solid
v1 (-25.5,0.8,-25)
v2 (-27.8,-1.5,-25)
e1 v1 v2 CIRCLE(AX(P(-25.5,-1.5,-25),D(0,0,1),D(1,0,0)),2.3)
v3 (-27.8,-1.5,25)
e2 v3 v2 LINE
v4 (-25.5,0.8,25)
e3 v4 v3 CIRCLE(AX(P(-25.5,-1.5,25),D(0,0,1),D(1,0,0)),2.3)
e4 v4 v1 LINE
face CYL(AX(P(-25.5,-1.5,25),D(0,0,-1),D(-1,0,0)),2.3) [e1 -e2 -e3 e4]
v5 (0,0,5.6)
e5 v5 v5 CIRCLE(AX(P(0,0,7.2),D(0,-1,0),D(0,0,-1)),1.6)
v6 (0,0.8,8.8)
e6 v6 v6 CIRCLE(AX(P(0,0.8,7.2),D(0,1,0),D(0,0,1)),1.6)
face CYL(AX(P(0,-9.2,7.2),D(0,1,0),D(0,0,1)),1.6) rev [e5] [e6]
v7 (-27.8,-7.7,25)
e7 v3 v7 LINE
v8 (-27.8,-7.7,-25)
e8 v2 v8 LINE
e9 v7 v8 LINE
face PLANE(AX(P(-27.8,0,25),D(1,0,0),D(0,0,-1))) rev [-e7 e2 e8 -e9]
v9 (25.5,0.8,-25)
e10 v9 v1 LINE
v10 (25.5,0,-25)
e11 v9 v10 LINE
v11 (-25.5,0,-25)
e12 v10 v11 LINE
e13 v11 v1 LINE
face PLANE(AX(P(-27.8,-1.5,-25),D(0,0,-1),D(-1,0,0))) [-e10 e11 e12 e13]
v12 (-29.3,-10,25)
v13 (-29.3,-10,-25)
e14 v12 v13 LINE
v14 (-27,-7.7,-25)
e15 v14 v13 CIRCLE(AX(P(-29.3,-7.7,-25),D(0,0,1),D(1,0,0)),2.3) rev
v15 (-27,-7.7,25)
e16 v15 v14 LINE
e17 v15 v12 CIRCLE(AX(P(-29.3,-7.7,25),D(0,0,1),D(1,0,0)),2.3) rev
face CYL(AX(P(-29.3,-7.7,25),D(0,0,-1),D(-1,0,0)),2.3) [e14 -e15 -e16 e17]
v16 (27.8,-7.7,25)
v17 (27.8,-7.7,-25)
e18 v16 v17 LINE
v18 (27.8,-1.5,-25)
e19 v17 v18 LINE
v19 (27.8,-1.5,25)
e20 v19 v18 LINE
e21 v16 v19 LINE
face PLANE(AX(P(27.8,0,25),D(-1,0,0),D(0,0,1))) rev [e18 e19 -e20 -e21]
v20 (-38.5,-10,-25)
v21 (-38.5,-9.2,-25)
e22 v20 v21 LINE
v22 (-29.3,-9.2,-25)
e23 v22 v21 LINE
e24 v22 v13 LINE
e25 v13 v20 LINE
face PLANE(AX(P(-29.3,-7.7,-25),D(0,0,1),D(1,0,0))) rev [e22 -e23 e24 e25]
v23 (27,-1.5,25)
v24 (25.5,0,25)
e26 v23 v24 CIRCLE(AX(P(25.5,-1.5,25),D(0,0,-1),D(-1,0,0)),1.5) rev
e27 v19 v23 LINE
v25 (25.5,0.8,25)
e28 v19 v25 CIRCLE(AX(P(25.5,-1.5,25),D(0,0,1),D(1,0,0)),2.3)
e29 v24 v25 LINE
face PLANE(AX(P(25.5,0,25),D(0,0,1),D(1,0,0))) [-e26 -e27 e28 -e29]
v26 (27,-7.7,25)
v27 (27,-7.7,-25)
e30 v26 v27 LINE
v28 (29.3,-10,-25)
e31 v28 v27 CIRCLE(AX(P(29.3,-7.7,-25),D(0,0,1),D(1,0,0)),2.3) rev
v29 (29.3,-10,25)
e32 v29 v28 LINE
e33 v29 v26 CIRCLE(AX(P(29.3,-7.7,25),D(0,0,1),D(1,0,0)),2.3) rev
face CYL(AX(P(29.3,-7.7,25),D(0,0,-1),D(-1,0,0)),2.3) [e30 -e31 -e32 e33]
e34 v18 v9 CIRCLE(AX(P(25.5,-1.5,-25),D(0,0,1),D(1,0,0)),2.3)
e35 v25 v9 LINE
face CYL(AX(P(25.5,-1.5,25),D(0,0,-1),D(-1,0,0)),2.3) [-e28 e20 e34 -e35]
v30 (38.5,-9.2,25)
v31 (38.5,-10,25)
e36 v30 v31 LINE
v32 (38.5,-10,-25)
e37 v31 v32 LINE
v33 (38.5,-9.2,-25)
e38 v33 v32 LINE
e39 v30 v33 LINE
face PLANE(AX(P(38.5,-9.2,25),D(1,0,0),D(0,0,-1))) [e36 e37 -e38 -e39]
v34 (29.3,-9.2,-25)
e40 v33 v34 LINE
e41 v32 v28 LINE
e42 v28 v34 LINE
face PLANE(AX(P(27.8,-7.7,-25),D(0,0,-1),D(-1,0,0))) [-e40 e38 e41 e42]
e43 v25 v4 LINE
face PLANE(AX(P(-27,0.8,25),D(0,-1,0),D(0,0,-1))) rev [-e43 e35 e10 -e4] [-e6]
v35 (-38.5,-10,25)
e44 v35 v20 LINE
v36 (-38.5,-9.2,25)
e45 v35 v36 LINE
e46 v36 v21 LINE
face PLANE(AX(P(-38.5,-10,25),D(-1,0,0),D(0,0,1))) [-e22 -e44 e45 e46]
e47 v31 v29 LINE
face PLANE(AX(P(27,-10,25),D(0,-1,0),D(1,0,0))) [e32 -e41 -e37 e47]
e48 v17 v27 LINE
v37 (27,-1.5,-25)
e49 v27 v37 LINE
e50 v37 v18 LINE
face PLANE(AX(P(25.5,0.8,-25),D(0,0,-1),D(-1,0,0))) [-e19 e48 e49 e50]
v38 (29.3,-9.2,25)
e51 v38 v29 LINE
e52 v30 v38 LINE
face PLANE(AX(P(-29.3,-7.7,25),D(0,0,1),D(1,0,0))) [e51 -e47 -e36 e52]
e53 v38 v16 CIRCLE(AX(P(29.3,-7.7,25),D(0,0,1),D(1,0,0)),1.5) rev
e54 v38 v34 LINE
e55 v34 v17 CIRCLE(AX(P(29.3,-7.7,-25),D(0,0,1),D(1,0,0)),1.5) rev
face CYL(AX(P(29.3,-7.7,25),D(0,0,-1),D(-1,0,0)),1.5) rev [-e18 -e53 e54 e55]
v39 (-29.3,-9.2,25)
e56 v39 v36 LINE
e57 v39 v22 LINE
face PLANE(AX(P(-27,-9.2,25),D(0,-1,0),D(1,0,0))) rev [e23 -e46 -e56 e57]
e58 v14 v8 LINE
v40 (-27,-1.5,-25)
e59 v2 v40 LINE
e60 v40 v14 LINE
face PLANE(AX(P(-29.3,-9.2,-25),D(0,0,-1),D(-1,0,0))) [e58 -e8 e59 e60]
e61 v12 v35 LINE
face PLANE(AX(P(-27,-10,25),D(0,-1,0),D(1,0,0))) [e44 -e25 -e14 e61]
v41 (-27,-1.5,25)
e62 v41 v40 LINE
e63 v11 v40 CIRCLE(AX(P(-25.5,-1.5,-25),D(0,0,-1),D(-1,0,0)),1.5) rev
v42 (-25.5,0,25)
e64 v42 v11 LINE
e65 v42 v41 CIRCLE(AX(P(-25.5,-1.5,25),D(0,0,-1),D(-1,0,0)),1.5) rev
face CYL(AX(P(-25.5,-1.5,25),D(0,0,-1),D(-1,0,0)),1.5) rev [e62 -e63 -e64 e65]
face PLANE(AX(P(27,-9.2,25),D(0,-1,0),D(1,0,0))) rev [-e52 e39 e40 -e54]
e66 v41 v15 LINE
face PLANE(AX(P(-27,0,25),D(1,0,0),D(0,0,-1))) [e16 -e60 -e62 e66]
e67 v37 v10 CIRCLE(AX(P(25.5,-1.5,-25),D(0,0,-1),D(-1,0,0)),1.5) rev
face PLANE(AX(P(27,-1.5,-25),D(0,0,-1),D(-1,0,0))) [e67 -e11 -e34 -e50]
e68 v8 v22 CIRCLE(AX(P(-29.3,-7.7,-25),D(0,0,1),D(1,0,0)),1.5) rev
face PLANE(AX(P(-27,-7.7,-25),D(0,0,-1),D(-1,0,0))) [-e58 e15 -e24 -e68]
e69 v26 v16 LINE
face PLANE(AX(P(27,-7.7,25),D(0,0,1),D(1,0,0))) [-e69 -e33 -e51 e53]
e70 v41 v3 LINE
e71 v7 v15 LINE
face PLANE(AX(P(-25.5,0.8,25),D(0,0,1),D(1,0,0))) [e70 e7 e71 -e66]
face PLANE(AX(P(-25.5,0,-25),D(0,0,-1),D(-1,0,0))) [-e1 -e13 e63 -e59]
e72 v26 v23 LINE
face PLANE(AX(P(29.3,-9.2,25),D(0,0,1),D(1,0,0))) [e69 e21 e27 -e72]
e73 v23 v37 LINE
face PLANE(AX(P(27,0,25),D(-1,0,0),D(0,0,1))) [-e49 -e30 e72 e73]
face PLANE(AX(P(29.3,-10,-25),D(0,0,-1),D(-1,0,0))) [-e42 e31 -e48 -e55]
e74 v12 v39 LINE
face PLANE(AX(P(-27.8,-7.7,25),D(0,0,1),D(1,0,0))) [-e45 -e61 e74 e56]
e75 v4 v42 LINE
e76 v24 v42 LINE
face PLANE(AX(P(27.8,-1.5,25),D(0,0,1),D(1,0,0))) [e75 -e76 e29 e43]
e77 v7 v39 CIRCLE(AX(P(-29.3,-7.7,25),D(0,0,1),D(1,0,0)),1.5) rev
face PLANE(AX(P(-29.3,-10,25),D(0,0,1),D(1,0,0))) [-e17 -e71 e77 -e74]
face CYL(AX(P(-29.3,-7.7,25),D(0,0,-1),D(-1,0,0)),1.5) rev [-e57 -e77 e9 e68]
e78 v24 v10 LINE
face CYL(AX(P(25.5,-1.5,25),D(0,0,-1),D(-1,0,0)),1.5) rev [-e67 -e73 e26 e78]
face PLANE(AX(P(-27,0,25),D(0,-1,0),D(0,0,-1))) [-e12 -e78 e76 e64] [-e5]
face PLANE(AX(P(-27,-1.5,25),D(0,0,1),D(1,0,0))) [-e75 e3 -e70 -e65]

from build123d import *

# Parameters (mm, degrees)
BASE_FLANGE1_DEPTH = 25
SKETCH2_R          = 1.6
CUT_EXTRUDE1_DEPTH = 10


# Sheet-metal steps are written as plain solids
with BuildPart() as part:
    # Sketch1 → Base-Flange1 (new, symmetric)
    with BuildSketch(Plane.XY):
        with BuildLine():
            Line((-38.5, -10), (-29.3, -10))
            ThreePointArc((-29.3, -10), (-27.673654403, -9.326345597), (-27, -7.7))
            Line((-27, -7.7), (-27, -1.5))
            ThreePointArc((-27, -1.5), (-26.560660172, -0.439339828), (-25.5, 0))
            Line((-25.5, 0), (25.5, 0))
            ThreePointArc((25.5, 0), (26.560660172, -0.439339828), (27, -1.5))
            Line((27, -1.5), (27, -7.7))
            ThreePointArc((27, -7.7), (27.673654403, -9.326345597), (29.3, -10))
            Line((29.3, -10), (38.5, -10))
            Line((38.5, -10), (38.5, -9.2))
            Line((38.5, -9.2), (29.3, -9.2))
            ThreePointArc((29.3, -9.2), (28.239339828, -8.760660172), (27.8, -7.7))
            Line((27.8, -7.7), (27.8, -1.5))
            ThreePointArc((27.8, -1.5), (27.126345597, 0.126345597), (25.5, 0.8))
            Line((25.5, 0.8), (-25.5, 0.8))
            ThreePointArc((-25.5, 0.8), (-27.126345597, 0.126345597), (-27.8, -1.5))
            Line((-27.8, -1.5), (-27.8, -7.7))
            ThreePointArc((-27.8, -7.7), (-28.239339828, -8.760660172), (-29.3, -9.2))
            Line((-29.3, -9.2), (-38.5, -9.2))
            Line((-38.5, -9.2), (-38.5, -10))
        make_face()
    extrude(amount=BASE_FLANGE1_DEPTH, both=True)

    # Sketch2 → Cut-Extrude1 (cut)
    with BuildSketch(Plane(origin=(0, 0.8, 0), x_dir=(1, 0, 0), z_dir=(0, 1, 0))):
        with Locations(Location((0, -7.2, 0), (0, 0, 270))):
            Circle(SKETCH2_R)
    extrude(amount=-CUT_EXTRUDE1_DEPTH, mode=Mode.SUBTRACT)


solid = part.part
